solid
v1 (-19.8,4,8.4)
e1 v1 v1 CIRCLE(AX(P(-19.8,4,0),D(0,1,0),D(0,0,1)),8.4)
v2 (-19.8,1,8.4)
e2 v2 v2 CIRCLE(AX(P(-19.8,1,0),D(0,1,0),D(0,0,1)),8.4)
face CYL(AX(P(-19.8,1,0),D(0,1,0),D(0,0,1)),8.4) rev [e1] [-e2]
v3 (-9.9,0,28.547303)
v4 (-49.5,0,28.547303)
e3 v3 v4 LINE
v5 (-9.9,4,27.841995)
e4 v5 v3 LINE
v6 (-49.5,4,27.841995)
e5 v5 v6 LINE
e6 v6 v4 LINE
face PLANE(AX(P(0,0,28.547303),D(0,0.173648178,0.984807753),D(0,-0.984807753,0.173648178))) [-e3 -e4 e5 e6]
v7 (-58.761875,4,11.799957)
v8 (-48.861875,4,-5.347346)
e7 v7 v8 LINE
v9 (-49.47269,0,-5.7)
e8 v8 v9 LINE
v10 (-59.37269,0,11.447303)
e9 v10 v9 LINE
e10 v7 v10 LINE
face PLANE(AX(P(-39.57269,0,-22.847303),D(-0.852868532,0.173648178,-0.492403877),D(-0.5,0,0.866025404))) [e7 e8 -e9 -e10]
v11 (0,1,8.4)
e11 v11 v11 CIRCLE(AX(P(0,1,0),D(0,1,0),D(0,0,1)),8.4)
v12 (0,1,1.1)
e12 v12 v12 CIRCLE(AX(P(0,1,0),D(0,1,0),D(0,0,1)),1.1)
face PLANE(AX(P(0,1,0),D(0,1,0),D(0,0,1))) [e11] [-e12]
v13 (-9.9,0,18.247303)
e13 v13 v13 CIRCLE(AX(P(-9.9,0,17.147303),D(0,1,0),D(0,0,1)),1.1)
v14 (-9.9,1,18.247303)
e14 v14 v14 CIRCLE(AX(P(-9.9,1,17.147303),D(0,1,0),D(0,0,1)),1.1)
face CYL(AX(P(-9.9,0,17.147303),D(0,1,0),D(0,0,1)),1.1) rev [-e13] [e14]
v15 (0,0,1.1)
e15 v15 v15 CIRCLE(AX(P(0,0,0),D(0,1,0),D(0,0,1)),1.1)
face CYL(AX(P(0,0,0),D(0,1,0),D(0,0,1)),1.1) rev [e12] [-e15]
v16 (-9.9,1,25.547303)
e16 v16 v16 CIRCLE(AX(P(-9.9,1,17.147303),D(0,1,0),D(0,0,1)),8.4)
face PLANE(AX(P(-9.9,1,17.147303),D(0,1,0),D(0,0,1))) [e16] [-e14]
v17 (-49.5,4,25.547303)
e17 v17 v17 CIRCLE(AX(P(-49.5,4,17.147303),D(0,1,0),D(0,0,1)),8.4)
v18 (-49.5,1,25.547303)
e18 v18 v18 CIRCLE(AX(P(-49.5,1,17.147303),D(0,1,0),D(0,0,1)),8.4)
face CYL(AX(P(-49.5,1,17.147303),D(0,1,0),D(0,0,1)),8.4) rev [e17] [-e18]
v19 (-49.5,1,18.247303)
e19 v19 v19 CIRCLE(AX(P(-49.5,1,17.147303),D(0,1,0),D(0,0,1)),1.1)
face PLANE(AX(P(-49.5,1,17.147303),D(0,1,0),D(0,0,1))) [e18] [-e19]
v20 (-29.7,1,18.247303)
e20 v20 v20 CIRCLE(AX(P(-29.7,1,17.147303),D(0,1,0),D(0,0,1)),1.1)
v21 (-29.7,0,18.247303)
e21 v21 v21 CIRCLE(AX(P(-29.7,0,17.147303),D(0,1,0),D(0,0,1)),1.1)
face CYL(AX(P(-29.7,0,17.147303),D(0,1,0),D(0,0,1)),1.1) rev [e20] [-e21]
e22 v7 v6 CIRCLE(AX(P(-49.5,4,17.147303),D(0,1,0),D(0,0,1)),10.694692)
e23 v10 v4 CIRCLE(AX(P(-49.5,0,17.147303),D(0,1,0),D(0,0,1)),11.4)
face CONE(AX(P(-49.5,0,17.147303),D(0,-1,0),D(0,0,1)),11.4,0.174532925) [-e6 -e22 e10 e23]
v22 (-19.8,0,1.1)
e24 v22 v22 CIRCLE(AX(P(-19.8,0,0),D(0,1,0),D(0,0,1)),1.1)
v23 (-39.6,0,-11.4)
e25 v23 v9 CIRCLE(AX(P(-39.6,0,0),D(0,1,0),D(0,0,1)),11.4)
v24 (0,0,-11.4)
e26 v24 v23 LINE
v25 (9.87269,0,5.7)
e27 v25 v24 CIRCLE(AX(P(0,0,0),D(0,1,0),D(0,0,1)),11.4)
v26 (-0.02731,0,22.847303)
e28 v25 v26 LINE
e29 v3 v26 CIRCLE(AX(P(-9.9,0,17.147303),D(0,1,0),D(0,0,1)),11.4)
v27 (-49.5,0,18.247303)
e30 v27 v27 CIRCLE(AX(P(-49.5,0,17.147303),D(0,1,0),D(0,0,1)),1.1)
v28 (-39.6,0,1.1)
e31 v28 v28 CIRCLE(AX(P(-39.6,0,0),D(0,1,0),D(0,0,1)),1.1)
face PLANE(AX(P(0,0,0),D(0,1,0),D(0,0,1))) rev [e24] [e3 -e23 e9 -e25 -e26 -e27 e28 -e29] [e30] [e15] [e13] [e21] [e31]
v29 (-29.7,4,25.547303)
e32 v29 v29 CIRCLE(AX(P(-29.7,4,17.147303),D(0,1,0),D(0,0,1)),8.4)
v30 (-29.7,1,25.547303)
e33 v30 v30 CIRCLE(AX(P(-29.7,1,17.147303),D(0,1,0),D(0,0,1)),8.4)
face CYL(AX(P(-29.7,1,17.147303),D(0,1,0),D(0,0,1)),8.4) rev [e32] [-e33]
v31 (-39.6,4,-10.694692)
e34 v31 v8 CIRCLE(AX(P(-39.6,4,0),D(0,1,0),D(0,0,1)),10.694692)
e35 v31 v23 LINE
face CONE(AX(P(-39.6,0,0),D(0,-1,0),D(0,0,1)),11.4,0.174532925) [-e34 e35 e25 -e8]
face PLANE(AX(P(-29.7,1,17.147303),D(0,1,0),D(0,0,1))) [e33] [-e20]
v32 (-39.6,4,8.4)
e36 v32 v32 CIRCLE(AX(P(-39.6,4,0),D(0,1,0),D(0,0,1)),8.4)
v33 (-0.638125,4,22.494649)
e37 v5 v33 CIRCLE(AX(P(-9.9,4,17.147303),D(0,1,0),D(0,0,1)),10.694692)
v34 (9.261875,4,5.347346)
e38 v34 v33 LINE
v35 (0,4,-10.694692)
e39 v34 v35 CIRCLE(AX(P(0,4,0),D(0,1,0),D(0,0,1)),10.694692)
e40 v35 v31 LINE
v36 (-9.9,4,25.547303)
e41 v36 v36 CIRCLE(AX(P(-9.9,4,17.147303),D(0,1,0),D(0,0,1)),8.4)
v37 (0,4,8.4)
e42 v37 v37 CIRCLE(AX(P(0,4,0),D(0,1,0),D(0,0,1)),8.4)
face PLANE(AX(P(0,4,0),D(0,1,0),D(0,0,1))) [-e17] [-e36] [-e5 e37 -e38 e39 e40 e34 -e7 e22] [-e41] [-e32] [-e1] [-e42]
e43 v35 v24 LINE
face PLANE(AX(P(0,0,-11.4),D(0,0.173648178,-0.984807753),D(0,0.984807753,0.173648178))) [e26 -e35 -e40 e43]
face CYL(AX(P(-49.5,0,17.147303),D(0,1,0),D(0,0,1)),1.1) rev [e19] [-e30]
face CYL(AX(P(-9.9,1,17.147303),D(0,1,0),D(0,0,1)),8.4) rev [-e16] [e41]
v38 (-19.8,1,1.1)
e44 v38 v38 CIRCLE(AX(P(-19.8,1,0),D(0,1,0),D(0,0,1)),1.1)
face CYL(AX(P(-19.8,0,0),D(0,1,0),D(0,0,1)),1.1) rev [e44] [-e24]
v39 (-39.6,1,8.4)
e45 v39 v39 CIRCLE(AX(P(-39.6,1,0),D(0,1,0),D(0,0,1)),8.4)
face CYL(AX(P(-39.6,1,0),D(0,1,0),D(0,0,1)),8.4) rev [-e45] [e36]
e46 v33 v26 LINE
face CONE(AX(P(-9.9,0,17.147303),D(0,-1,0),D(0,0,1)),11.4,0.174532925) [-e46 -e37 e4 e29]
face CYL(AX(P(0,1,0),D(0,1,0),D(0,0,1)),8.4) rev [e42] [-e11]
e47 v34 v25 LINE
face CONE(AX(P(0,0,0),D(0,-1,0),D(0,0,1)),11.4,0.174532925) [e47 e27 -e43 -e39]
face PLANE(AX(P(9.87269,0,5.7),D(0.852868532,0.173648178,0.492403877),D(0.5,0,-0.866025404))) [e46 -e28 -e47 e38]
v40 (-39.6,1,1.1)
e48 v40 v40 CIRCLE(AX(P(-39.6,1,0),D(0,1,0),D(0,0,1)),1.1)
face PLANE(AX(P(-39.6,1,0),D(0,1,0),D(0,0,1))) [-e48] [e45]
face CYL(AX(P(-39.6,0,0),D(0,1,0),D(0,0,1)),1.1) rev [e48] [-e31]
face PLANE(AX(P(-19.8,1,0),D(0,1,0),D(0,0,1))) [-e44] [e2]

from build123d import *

# Parameters (mm, degrees)
BOSS_EXTRUDE1_DEPTH = 4
BOSS_EXTRUDE1_DRAFT = 10
CUT_EXTRUDE1_START  = 4
SKETCH1_3_R         = 1.1
CUT_EXTRUDE1_DEPTH  = 4
CUT_EXTRUDE2_START  = 4
SKETCH1_4_R         = 8.4
SKETCH1_4_R_2       = 1.1
CUT_EXTRUDE2_DEPTH  = 3


# Read off the part's stored shape, not the designer's step: Boss-Extrude1
with BuildPart() as part:
    # Boss-Extrude1 outline → Boss-Extrude1 (with draft: the straight prism first)
    with BuildSketch(Plane(origin=(0, 4, 0), x_dir=(1, 0, 0), z_dir=(0, 1, 0))):
        with BuildLine():
            ThreePointArc((-58.761875024, -11.799956956), (-58.761875024, -22.494649034), (-49.5, -27.841995072))
            Line((-49.5, -27.841995072), (-9.9, -27.841995072))
            ThreePointArc((-9.9, -27.841995072), (-4.552653961, -26.409178019), (-0.638124976, -22.494649034))
            Line((-0.638124976, -22.494649034), (9.261875024, -5.347346039))
            ThreePointArc((9.261875024, -5.347346039), (9.261875024, 5.347346039), (0, 10.694692077))
            Line((0, 10.694692077), (-39.6, 10.694692077))
            ThreePointArc((-39.6, 10.694692077), (-44.947346039, 9.261875024), (-48.861875024, 5.347346039))
            Line((-48.861875024, 5.347346039), (-58.761875024, -11.799956956))
        make_face()
    extrude(amount=-BOSS_EXTRUDE1_DEPTH)
    # Boss-Extrude1: the draft: its side faces are tilted about the plane it starts from
    boss_extrude1_sides = [part.faces().sort_by_distance(p)[0] for p in [
        (-53.811875024, 2, 3.226305459),
        (-58.761875024, 2, 22.494649033),
        (-29.7, 2, 27.841995072),
        (-4.552653962, 2, 26.409178019),
        (4.311875024, 2, 13.920997536),
        (9.261875024, 2, -5.347346038),
        (-19.8, 2, -10.694692077),
        (-44.947346038, 2, -9.261875024),
    ]]
    draft(boss_extrude1_sides, Plane(origin=(0, 4, 0), x_dir=(1, 0, 0), z_dir=(0, 1, 0)), BOSS_EXTRUDE1_DRAFT)

    # Sketch1<3> → Cut-Extrude1 (cut)
    with BuildSketch(Plane(origin=(0, 0, 0), x_dir=(1, 0, 0), z_dir=(0, 1, 0)).offset(CUT_EXTRUDE1_START)):
        with Locations(Location((-9.9, -17.147302995, 0), (0, 0, 270))):
            Circle(SKETCH1_3_R)
        with Locations(Location((0, 0, 0), (0, 0, 270))):
            Circle(SKETCH1_3_R)
        with Locations(Location((-29.7, -17.147302995, 0), (0, 0, 270))):
            Circle(SKETCH1_3_R)
        with Locations(Location((-39.6, 0, 0), (0, 0, 270))):
            Circle(SKETCH1_3_R)
        with Locations(Location((-49.5, -17.147302995, 0), (0, 0, 270))):
            Circle(SKETCH1_3_R)
        with Locations(Location((-19.8, 0, 0), (0, 0, 270))):
            Circle(SKETCH1_3_R)
    extrude(amount=-CUT_EXTRUDE1_DEPTH, mode=Mode.SUBTRACT)

    # Sketch1<4> → Cut-Extrude2 (cut)
    # profile 1 of 6: a face of its own
    with BuildSketch(Plane(origin=(0, 0, 0), x_dir=(1, 0, 0), z_dir=(0, 1, 0)).offset(CUT_EXTRUDE2_START)):
        with Locations(Location((-19.8, 0, 0), (0, 0, 270))):
            Circle(SKETCH1_4_R)
        with Locations(Location((-19.8, 0, 0), (0, 0, 270))):
            Circle(SKETCH1_4_R_2, mode=Mode.SUBTRACT)
    # profile 2 of 6: a face of its own
    with BuildSketch(Plane(origin=(0, 0, 0), x_dir=(1, 0, 0), z_dir=(0, 1, 0)).offset(CUT_EXTRUDE2_START)):
        with Locations(Location((-9.9, -17.147302995, 0), (0, 0, 270))):
            Circle(SKETCH1_4_R)
        with Locations(Location((-9.9, -17.147302995, 0), (0, 0, 270))):
            Circle(SKETCH1_4_R_2, mode=Mode.SUBTRACT)
    # profile 3 of 6: a face of its own
    with BuildSketch(Plane(origin=(0, 0, 0), x_dir=(1, 0, 0), z_dir=(0, 1, 0)).offset(CUT_EXTRUDE2_START)):
        with Locations(Location((0, 0, 0), (0, 0, 270))):
            Circle(SKETCH1_4_R)
        with Locations(Location((0, 0, 0), (0, 0, 270))):
            Circle(SKETCH1_4_R_2, mode=Mode.SUBTRACT)
    # profile 4 of 6: a face of its own
    with BuildSketch(Plane(origin=(0, 0, 0), x_dir=(1, 0, 0), z_dir=(0, 1, 0)).offset(CUT_EXTRUDE2_START)):
        with Locations(Location((-29.7, -17.147302995, 0), (0, 0, 270))):
            Circle(SKETCH1_4_R)
        with Locations(Location((-29.7, -17.147302995, 0), (0, 0, 270))):
            Circle(SKETCH1_4_R_2, mode=Mode.SUBTRACT)
    # profile 5 of 6: a face of its own
    with BuildSketch(Plane(origin=(0, 0, 0), x_dir=(1, 0, 0), z_dir=(0, 1, 0)).offset(CUT_EXTRUDE2_START)):
        with Locations(Location((-39.6, 0, 0), (0, 0, 270))):
            Circle(SKETCH1_4_R)
        with Locations(Location((-39.6, 0, 0), (0, 0, 270))):
            Circle(SKETCH1_4_R_2, mode=Mode.SUBTRACT)
    # profile 6 of 6: a face of its own
    with BuildSketch(Plane(origin=(0, 0, 0), x_dir=(1, 0, 0), z_dir=(0, 1, 0)).offset(CUT_EXTRUDE2_START)):
        with Locations(Location((-49.5, -17.147302995, 0), (0, 0, 270))):
            Circle(SKETCH1_4_R)
        with Locations(Location((-49.5, -17.147302995, 0), (0, 0, 270))):
            Circle(SKETCH1_4_R_2, mode=Mode.SUBTRACT)
    extrude(amount=-CUT_EXTRUDE2_DEPTH, mode=Mode.SUBTRACT)


solid = part.part
